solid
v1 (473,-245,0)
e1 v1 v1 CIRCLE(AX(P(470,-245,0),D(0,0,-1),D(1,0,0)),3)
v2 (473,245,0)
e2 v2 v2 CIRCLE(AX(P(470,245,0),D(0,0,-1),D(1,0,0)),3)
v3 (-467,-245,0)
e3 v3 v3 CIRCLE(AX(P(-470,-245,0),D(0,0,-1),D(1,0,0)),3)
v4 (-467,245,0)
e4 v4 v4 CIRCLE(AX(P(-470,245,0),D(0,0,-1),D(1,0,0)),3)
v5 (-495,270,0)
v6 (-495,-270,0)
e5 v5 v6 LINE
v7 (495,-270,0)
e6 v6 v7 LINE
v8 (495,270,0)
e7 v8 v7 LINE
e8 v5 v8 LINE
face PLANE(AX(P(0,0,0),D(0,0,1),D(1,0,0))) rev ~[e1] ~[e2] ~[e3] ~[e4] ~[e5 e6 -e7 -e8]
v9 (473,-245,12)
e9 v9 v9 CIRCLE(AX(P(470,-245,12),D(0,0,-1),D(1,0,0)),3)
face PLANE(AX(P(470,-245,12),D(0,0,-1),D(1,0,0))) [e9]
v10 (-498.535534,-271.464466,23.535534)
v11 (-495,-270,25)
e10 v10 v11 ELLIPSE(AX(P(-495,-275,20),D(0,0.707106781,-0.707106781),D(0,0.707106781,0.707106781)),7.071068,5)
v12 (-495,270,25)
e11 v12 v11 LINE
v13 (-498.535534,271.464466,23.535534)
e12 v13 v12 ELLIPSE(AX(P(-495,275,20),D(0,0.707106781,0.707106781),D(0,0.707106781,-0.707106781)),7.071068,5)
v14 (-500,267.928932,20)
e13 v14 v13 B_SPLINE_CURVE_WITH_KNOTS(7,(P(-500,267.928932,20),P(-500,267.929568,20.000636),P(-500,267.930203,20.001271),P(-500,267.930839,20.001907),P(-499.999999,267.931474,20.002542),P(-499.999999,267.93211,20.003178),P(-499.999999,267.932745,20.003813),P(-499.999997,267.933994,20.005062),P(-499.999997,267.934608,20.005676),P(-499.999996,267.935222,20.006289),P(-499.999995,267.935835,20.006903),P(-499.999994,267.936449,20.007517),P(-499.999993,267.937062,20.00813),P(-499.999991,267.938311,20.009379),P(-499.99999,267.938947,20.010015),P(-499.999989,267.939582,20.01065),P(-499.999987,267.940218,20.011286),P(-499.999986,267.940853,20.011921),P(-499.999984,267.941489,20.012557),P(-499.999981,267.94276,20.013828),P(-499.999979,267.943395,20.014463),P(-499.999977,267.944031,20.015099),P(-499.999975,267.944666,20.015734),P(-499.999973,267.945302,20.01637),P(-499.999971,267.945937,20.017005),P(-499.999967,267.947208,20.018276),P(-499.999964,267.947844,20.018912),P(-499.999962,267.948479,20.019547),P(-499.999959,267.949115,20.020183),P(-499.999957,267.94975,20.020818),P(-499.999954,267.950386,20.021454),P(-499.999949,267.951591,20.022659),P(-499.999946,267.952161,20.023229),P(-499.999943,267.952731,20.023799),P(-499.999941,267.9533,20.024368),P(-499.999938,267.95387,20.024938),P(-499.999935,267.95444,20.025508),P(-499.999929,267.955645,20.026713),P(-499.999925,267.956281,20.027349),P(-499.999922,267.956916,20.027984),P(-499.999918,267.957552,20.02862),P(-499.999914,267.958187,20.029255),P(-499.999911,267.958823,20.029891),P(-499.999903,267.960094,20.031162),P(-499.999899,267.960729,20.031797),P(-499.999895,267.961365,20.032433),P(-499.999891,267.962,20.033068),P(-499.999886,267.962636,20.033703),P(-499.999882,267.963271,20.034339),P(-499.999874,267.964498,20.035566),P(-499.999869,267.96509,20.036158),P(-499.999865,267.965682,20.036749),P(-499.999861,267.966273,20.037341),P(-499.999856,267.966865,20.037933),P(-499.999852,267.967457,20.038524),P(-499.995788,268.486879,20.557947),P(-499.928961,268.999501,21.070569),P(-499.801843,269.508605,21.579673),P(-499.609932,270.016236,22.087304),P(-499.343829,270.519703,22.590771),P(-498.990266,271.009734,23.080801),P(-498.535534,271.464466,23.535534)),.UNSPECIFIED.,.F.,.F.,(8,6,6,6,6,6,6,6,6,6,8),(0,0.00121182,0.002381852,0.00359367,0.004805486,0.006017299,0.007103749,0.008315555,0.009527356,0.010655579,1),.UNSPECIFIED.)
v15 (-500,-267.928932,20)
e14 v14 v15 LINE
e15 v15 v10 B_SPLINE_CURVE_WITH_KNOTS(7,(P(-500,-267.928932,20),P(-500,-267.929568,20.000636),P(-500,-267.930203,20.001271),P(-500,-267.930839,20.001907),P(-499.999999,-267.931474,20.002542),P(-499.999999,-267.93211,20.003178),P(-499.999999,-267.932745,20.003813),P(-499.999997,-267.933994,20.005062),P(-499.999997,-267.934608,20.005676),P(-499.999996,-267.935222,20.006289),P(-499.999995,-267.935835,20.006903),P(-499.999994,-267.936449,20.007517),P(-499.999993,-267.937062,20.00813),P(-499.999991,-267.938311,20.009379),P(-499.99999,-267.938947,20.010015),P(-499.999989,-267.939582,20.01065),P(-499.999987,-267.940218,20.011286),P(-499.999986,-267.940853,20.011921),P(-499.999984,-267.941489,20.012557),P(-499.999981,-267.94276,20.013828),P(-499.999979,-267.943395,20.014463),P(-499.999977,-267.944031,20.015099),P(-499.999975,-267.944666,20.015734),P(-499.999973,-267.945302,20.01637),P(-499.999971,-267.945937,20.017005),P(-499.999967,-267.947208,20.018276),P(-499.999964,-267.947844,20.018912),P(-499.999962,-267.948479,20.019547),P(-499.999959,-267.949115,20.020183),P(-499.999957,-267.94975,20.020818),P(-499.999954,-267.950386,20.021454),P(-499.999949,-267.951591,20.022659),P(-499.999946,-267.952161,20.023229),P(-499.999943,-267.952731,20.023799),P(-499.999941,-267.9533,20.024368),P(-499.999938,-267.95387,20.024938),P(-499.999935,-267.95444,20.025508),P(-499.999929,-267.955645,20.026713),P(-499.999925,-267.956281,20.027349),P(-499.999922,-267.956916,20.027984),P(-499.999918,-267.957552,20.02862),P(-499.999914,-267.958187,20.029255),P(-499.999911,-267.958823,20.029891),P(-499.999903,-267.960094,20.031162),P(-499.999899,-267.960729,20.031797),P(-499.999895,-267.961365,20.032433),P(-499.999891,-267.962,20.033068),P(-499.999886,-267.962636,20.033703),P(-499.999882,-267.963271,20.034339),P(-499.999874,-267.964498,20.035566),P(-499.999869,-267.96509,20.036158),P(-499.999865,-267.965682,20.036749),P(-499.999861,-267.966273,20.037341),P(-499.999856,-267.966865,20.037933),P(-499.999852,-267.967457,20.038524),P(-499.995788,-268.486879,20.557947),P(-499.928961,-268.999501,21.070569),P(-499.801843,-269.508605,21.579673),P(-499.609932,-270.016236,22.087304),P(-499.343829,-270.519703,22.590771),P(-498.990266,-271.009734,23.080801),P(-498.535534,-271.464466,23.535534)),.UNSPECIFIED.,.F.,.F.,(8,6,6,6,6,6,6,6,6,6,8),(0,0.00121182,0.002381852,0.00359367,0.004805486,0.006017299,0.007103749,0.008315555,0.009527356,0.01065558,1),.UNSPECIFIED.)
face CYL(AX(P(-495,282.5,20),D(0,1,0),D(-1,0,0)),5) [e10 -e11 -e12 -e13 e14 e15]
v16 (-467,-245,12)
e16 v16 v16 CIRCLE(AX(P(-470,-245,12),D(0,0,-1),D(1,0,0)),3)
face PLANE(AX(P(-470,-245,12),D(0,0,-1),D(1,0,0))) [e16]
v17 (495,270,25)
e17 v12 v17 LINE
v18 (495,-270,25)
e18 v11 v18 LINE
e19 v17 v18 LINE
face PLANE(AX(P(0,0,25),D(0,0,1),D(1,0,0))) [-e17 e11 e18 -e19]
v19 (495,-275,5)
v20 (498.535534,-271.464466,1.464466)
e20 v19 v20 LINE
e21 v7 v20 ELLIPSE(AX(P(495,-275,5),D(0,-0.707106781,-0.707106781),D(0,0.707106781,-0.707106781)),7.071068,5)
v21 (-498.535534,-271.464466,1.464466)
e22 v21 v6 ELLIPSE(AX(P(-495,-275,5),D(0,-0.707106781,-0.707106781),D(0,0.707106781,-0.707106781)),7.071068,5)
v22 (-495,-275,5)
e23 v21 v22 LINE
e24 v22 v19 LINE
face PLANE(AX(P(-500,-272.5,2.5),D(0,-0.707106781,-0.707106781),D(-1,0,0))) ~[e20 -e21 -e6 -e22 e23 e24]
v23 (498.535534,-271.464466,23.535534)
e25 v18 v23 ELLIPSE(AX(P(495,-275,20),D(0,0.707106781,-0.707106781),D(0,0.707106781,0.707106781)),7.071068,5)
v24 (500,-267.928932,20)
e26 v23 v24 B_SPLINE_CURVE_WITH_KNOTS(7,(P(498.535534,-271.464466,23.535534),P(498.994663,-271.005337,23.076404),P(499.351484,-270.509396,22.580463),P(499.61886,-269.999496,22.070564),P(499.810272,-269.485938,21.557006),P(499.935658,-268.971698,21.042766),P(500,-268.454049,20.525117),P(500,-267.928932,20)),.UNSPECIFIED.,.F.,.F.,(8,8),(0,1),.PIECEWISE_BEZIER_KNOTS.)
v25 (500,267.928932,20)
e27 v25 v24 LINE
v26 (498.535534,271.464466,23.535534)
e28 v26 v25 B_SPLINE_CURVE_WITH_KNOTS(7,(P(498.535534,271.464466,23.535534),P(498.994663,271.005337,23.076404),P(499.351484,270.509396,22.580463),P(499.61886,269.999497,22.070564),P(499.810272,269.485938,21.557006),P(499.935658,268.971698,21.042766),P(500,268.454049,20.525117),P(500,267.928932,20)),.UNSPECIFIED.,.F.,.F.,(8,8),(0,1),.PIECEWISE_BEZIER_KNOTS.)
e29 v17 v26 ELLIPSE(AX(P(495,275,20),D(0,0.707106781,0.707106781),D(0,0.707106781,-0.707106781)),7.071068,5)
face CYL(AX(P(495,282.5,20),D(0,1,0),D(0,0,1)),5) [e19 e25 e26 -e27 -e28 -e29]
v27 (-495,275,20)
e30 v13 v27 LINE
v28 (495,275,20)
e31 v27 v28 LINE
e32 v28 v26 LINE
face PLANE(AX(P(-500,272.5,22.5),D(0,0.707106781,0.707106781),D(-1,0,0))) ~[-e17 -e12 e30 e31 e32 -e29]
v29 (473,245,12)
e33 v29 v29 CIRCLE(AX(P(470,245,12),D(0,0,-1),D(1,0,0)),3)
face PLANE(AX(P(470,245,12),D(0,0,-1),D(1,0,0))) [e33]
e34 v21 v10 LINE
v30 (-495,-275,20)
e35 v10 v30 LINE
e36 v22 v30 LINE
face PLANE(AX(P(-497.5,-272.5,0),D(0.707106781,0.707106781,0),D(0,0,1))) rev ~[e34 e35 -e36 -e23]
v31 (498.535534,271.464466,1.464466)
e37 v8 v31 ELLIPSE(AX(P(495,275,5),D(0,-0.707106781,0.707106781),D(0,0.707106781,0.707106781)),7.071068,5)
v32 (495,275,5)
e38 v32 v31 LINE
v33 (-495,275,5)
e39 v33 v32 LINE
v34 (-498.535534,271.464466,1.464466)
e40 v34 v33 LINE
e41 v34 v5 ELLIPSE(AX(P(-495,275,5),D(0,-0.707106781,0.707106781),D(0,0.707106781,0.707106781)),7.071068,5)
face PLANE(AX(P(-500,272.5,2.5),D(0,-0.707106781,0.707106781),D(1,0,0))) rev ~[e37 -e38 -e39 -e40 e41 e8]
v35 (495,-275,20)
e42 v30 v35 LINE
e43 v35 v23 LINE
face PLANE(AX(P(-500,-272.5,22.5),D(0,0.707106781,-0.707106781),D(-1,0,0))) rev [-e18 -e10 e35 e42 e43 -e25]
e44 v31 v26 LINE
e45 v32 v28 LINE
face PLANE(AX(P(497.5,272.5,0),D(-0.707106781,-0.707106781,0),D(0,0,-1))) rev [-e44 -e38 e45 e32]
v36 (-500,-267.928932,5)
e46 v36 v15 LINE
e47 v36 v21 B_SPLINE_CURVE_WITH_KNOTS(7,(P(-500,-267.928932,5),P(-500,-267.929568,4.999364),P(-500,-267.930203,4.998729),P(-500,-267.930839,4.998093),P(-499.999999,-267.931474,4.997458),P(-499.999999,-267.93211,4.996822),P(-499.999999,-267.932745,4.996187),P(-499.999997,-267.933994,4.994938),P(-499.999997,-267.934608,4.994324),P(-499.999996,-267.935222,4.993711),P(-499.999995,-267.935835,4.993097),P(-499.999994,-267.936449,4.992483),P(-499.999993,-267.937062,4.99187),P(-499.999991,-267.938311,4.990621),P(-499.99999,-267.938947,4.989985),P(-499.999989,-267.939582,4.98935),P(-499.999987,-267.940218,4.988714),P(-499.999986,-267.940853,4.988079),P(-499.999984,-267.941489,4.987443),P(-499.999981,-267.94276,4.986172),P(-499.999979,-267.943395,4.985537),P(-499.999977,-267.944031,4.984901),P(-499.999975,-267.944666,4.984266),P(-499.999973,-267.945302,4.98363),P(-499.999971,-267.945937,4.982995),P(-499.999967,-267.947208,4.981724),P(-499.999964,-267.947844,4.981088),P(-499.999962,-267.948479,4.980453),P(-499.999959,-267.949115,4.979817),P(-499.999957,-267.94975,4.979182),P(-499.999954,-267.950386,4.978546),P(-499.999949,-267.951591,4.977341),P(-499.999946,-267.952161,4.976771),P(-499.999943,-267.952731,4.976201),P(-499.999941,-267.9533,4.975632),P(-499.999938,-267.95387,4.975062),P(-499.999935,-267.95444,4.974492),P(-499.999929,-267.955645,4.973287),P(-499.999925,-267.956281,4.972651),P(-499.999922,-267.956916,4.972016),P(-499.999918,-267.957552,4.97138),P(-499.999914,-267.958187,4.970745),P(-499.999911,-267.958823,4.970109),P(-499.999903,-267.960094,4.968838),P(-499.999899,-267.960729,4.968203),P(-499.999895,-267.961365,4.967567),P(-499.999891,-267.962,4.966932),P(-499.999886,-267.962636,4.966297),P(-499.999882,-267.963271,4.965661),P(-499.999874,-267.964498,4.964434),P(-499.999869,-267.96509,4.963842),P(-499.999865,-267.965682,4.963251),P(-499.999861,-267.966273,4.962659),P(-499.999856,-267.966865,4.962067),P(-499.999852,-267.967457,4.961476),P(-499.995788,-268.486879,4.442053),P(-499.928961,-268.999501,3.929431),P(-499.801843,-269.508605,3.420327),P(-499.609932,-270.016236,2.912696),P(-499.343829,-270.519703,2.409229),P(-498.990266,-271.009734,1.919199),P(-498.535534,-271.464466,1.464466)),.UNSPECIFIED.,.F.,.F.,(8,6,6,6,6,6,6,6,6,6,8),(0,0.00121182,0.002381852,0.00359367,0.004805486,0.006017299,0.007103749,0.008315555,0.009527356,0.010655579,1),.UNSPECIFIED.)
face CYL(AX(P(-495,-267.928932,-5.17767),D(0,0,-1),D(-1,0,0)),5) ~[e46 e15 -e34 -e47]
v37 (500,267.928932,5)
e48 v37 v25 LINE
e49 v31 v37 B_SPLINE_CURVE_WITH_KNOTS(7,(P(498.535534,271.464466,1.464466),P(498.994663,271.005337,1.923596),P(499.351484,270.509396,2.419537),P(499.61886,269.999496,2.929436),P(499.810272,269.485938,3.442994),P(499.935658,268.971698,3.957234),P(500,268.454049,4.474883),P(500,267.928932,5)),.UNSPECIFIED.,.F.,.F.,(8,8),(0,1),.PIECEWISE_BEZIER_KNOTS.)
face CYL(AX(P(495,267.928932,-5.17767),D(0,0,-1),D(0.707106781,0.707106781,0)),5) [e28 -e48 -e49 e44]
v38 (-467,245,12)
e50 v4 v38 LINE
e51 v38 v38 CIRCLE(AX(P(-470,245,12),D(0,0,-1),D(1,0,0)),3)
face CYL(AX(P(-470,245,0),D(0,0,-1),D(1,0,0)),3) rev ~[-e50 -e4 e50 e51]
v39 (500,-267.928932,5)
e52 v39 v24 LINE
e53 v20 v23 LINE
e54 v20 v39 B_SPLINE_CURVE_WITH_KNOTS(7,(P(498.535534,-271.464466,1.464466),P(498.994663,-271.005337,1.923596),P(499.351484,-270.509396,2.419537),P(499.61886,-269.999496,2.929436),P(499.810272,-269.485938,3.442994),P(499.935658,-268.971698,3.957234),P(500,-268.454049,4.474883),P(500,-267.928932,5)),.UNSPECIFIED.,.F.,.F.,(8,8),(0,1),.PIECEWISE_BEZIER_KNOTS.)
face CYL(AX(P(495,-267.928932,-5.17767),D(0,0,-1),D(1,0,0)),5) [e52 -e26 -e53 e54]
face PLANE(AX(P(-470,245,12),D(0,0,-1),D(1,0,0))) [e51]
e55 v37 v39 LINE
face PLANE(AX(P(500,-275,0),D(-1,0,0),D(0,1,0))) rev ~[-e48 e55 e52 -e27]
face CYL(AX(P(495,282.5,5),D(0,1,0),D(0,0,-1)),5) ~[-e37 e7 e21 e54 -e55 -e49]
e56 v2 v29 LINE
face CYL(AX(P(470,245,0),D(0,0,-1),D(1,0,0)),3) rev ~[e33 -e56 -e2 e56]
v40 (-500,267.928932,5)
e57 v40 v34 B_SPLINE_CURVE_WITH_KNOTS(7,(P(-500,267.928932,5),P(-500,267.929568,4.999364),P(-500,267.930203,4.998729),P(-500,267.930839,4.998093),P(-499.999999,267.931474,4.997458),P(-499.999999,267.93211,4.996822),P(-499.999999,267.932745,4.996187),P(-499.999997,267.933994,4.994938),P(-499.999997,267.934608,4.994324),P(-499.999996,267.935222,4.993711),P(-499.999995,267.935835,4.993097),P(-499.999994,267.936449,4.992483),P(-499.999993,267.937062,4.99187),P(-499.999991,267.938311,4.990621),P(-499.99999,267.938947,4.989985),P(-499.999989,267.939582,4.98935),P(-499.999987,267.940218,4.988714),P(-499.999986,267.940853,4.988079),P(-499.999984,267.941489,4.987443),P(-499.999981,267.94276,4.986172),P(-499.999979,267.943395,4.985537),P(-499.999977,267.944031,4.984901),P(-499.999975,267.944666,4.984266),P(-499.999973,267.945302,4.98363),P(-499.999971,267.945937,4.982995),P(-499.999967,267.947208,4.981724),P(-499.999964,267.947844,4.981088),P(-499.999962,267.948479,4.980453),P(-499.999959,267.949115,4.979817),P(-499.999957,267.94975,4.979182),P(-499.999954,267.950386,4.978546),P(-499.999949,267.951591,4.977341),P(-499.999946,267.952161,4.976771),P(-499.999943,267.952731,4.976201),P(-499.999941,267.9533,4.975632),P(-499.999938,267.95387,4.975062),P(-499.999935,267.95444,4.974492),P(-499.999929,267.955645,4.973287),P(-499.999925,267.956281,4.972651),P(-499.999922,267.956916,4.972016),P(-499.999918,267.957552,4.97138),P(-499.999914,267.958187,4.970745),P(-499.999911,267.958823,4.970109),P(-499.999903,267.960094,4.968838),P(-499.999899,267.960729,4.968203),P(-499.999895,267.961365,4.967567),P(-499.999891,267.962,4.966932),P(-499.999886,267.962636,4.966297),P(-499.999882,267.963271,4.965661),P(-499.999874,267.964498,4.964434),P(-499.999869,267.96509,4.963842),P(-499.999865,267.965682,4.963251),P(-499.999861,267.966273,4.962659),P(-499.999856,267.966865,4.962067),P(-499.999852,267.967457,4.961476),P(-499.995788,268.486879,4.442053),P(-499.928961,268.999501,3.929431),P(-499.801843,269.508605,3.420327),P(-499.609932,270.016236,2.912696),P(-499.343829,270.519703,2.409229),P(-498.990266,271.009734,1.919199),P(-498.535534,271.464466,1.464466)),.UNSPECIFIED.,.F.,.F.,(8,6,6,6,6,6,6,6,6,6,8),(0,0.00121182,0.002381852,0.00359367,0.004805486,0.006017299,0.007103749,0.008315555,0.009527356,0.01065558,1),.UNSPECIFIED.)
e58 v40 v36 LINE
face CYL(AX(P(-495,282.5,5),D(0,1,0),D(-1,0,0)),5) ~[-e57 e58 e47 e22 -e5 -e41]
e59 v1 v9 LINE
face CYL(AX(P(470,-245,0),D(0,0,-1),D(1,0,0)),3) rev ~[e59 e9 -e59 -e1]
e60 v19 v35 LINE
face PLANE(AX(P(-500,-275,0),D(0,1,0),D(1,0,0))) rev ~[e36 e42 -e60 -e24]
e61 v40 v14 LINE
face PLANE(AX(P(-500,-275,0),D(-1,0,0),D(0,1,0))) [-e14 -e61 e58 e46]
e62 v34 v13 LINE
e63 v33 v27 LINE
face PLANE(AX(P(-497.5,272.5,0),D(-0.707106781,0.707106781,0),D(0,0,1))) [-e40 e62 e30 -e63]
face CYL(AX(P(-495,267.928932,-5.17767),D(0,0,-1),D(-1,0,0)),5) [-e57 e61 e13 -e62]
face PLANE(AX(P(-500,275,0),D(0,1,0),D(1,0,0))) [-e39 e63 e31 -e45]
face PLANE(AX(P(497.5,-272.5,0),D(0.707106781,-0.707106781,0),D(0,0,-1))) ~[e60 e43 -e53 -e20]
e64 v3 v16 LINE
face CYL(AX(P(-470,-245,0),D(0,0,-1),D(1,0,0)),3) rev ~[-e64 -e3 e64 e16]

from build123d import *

# Parameters (mm, degrees)
F0_W        = 1000
F0_H        = 550
F1_DEPTH    = 25
F2_SIZE     = 5
F3_SIZE     = 5
F4_T1_DEPTH = 565
F4_T3_DEPTH = 35.3553390593
F5_T1_DEPTH = 565
F5_T3_DEPTH = 35.3553390593
F6_R        = 3
F7_DEPTH    = 12
F8_R        = 3
F9_DEPTH    = 12
F10_R       = 3
F11_DEPTH   = 12
F12_R       = 3
F13_DEPTH   = 12


# Not quite as in the source:
# - a fillet or chamfer that OpenCascade refuses, or shapes differently, is made with other operations: its cross-section is extruded or revolved along the edge and cut away or added


with BuildPart() as f1:
    # F0 (on Top) → F1 (new body)
    with BuildSketch(Plane.XY):
        Rectangle(F0_W, F0_H)
    extrude(amount=F1_DEPTH)

    # F2
    f2_edges = [f1.edges().sort_by_distance(p)[0] for p in [
        (-500, -275, 12.5),
        (500, -275, 12.5),
        (0, -275, 0),
        (0, -275, 25),
    ]]
    chamfer(f2_edges, length=F2_SIZE)

    # F3
    f3_edges = [f1.edges().sort_by_distance(p)[0] for p in [
        (500, 275, 12.5),
        (-500, 275, 12.5),
        (0, 275, 0),
        (0, 275, 25),
    ]]
    chamfer(f3_edges, length=F3_SIZE)

    # F4: fillet of radius 5 on 4 edges, made by hand

    # F4_s2 → F4_t1 (cut)
    with BuildSketch(Plane.XZ.offset(-282.5)):
        with BuildLine():
            ThreePointArc((-500, 5), (-498.5355339059, 1.4644660941), (-495, 0))
            Line((-495, 0), (-500, 0))
            Line((-500, 0), (-500, 5))
        make_face()
        with BuildLine():
            ThreePointArc((-500, 20), (-498.5355339059, 23.5355339059), (-495, 25))
            Line((-495, 25), (-500, 25))
            Line((-500, 25), (-500, 20))
        make_face()
    extrude(amount=F4_T1_DEPTH, mode=Mode.SUBTRACT)

    # F4_s4 → F4_t3 (cut)
    with BuildSketch(Plane.XY.offset(-5.1776695297)):
        with BuildLine():
            ThreePointArc((-500, 267.9289321881), (-499.6193976626, 269.84234935), (-498.5355339059, 271.4644660941))
            Line((-498.5355339059, 271.4644660941), (-500, 270))
            Line((-500, 270), (-500, 267.9289321881))
        make_face()
        with BuildLine():
            ThreePointArc((-500, -267.9289321881), (-499.6193976626, -269.84234935), (-498.5355339059, -271.4644660941))
            Line((-498.5355339059, -271.4644660941), (-500, -270))
            Line((-500, -270), (-500, -267.9289321881))
        make_face()
    extrude(amount=F4_T3_DEPTH, mode=Mode.SUBTRACT)

    # F5: fillet of radius 5 on 4 edges, made by hand

    # F5_s2 → F5_t1 (cut)
    with BuildSketch(Plane.XZ.offset(-282.5)):
        with BuildLine():
            ThreePointArc((495, 0), (498.5355339059, 1.4644660941), (500, 5))
            Line((500, 5), (500, 0))
            Line((500, 0), (495, 0))
        make_face()
        with BuildLine():
            ThreePointArc((495, 25), (498.5355339059, 23.5355339059), (500, 20))
            Line((500, 20), (500, 25))
            Line((500, 25), (495, 25))
        make_face()
    extrude(amount=F5_T1_DEPTH, mode=Mode.SUBTRACT)

    # F5_s4 → F5_t3 (cut)
    with BuildSketch(Plane.XY.offset(-5.1776695297)):
        with BuildLine():
            ThreePointArc((498.5355339059, 271.4644660941), (499.6193976626, 269.84234935), (500, 267.9289321881))
            Line((500, 267.9289321881), (500, 270))
            Line((500, 270), (498.5355339059, 271.4644660941))
        make_face()
        with BuildLine():
            ThreePointArc((500, -267.9289321881), (499.6193976626, -269.84234935), (498.5355339059, -271.4644660941))
            Line((498.5355339059, -271.4644660941), (500, -270))
            Line((500, -270), (500, -267.9289321881))
        make_face()
    extrude(amount=F5_T3_DEPTH, mode=Mode.SUBTRACT)

    # F6 (on face) → F7 (cut)
    with BuildSketch(Plane(origin=(0, 0, 0), x_dir=(1, 0, 0), z_dir=(0, 0, -1))):
        with Locations((470, 245)):
            Circle(F6_R)
    extrude(amount=-F7_DEPTH, mode=Mode.SUBTRACT)

    # F8 (on face) → F9 (cut)
    with BuildSketch(Plane(origin=(0, 0, 0), x_dir=(1, 0, 0), z_dir=(0, 0, -1))):
        with Locations((470, -245)):
            Circle(F8_R)
    extrude(amount=-F9_DEPTH, mode=Mode.SUBTRACT)

    # F10 (on face) → F11 (cut)
    with BuildSketch(Plane(origin=(0, 0, 0), x_dir=(1, 0, 0), z_dir=(0, 0, -1))):
        with Locations((-470, 245)):
            Circle(F10_R)
    extrude(amount=-F11_DEPTH, mode=Mode.SUBTRACT)

    # F12 (on face) → F13 (cut)
    with BuildSketch(Plane(origin=(0, 0, 0), x_dir=(1, 0, 0), z_dir=(0, 0, -1))):
        with Locations((-470, -245)):
            Circle(F12_R)
    extrude(amount=-F13_DEPTH, mode=Mode.SUBTRACT)


solid = f1.part
